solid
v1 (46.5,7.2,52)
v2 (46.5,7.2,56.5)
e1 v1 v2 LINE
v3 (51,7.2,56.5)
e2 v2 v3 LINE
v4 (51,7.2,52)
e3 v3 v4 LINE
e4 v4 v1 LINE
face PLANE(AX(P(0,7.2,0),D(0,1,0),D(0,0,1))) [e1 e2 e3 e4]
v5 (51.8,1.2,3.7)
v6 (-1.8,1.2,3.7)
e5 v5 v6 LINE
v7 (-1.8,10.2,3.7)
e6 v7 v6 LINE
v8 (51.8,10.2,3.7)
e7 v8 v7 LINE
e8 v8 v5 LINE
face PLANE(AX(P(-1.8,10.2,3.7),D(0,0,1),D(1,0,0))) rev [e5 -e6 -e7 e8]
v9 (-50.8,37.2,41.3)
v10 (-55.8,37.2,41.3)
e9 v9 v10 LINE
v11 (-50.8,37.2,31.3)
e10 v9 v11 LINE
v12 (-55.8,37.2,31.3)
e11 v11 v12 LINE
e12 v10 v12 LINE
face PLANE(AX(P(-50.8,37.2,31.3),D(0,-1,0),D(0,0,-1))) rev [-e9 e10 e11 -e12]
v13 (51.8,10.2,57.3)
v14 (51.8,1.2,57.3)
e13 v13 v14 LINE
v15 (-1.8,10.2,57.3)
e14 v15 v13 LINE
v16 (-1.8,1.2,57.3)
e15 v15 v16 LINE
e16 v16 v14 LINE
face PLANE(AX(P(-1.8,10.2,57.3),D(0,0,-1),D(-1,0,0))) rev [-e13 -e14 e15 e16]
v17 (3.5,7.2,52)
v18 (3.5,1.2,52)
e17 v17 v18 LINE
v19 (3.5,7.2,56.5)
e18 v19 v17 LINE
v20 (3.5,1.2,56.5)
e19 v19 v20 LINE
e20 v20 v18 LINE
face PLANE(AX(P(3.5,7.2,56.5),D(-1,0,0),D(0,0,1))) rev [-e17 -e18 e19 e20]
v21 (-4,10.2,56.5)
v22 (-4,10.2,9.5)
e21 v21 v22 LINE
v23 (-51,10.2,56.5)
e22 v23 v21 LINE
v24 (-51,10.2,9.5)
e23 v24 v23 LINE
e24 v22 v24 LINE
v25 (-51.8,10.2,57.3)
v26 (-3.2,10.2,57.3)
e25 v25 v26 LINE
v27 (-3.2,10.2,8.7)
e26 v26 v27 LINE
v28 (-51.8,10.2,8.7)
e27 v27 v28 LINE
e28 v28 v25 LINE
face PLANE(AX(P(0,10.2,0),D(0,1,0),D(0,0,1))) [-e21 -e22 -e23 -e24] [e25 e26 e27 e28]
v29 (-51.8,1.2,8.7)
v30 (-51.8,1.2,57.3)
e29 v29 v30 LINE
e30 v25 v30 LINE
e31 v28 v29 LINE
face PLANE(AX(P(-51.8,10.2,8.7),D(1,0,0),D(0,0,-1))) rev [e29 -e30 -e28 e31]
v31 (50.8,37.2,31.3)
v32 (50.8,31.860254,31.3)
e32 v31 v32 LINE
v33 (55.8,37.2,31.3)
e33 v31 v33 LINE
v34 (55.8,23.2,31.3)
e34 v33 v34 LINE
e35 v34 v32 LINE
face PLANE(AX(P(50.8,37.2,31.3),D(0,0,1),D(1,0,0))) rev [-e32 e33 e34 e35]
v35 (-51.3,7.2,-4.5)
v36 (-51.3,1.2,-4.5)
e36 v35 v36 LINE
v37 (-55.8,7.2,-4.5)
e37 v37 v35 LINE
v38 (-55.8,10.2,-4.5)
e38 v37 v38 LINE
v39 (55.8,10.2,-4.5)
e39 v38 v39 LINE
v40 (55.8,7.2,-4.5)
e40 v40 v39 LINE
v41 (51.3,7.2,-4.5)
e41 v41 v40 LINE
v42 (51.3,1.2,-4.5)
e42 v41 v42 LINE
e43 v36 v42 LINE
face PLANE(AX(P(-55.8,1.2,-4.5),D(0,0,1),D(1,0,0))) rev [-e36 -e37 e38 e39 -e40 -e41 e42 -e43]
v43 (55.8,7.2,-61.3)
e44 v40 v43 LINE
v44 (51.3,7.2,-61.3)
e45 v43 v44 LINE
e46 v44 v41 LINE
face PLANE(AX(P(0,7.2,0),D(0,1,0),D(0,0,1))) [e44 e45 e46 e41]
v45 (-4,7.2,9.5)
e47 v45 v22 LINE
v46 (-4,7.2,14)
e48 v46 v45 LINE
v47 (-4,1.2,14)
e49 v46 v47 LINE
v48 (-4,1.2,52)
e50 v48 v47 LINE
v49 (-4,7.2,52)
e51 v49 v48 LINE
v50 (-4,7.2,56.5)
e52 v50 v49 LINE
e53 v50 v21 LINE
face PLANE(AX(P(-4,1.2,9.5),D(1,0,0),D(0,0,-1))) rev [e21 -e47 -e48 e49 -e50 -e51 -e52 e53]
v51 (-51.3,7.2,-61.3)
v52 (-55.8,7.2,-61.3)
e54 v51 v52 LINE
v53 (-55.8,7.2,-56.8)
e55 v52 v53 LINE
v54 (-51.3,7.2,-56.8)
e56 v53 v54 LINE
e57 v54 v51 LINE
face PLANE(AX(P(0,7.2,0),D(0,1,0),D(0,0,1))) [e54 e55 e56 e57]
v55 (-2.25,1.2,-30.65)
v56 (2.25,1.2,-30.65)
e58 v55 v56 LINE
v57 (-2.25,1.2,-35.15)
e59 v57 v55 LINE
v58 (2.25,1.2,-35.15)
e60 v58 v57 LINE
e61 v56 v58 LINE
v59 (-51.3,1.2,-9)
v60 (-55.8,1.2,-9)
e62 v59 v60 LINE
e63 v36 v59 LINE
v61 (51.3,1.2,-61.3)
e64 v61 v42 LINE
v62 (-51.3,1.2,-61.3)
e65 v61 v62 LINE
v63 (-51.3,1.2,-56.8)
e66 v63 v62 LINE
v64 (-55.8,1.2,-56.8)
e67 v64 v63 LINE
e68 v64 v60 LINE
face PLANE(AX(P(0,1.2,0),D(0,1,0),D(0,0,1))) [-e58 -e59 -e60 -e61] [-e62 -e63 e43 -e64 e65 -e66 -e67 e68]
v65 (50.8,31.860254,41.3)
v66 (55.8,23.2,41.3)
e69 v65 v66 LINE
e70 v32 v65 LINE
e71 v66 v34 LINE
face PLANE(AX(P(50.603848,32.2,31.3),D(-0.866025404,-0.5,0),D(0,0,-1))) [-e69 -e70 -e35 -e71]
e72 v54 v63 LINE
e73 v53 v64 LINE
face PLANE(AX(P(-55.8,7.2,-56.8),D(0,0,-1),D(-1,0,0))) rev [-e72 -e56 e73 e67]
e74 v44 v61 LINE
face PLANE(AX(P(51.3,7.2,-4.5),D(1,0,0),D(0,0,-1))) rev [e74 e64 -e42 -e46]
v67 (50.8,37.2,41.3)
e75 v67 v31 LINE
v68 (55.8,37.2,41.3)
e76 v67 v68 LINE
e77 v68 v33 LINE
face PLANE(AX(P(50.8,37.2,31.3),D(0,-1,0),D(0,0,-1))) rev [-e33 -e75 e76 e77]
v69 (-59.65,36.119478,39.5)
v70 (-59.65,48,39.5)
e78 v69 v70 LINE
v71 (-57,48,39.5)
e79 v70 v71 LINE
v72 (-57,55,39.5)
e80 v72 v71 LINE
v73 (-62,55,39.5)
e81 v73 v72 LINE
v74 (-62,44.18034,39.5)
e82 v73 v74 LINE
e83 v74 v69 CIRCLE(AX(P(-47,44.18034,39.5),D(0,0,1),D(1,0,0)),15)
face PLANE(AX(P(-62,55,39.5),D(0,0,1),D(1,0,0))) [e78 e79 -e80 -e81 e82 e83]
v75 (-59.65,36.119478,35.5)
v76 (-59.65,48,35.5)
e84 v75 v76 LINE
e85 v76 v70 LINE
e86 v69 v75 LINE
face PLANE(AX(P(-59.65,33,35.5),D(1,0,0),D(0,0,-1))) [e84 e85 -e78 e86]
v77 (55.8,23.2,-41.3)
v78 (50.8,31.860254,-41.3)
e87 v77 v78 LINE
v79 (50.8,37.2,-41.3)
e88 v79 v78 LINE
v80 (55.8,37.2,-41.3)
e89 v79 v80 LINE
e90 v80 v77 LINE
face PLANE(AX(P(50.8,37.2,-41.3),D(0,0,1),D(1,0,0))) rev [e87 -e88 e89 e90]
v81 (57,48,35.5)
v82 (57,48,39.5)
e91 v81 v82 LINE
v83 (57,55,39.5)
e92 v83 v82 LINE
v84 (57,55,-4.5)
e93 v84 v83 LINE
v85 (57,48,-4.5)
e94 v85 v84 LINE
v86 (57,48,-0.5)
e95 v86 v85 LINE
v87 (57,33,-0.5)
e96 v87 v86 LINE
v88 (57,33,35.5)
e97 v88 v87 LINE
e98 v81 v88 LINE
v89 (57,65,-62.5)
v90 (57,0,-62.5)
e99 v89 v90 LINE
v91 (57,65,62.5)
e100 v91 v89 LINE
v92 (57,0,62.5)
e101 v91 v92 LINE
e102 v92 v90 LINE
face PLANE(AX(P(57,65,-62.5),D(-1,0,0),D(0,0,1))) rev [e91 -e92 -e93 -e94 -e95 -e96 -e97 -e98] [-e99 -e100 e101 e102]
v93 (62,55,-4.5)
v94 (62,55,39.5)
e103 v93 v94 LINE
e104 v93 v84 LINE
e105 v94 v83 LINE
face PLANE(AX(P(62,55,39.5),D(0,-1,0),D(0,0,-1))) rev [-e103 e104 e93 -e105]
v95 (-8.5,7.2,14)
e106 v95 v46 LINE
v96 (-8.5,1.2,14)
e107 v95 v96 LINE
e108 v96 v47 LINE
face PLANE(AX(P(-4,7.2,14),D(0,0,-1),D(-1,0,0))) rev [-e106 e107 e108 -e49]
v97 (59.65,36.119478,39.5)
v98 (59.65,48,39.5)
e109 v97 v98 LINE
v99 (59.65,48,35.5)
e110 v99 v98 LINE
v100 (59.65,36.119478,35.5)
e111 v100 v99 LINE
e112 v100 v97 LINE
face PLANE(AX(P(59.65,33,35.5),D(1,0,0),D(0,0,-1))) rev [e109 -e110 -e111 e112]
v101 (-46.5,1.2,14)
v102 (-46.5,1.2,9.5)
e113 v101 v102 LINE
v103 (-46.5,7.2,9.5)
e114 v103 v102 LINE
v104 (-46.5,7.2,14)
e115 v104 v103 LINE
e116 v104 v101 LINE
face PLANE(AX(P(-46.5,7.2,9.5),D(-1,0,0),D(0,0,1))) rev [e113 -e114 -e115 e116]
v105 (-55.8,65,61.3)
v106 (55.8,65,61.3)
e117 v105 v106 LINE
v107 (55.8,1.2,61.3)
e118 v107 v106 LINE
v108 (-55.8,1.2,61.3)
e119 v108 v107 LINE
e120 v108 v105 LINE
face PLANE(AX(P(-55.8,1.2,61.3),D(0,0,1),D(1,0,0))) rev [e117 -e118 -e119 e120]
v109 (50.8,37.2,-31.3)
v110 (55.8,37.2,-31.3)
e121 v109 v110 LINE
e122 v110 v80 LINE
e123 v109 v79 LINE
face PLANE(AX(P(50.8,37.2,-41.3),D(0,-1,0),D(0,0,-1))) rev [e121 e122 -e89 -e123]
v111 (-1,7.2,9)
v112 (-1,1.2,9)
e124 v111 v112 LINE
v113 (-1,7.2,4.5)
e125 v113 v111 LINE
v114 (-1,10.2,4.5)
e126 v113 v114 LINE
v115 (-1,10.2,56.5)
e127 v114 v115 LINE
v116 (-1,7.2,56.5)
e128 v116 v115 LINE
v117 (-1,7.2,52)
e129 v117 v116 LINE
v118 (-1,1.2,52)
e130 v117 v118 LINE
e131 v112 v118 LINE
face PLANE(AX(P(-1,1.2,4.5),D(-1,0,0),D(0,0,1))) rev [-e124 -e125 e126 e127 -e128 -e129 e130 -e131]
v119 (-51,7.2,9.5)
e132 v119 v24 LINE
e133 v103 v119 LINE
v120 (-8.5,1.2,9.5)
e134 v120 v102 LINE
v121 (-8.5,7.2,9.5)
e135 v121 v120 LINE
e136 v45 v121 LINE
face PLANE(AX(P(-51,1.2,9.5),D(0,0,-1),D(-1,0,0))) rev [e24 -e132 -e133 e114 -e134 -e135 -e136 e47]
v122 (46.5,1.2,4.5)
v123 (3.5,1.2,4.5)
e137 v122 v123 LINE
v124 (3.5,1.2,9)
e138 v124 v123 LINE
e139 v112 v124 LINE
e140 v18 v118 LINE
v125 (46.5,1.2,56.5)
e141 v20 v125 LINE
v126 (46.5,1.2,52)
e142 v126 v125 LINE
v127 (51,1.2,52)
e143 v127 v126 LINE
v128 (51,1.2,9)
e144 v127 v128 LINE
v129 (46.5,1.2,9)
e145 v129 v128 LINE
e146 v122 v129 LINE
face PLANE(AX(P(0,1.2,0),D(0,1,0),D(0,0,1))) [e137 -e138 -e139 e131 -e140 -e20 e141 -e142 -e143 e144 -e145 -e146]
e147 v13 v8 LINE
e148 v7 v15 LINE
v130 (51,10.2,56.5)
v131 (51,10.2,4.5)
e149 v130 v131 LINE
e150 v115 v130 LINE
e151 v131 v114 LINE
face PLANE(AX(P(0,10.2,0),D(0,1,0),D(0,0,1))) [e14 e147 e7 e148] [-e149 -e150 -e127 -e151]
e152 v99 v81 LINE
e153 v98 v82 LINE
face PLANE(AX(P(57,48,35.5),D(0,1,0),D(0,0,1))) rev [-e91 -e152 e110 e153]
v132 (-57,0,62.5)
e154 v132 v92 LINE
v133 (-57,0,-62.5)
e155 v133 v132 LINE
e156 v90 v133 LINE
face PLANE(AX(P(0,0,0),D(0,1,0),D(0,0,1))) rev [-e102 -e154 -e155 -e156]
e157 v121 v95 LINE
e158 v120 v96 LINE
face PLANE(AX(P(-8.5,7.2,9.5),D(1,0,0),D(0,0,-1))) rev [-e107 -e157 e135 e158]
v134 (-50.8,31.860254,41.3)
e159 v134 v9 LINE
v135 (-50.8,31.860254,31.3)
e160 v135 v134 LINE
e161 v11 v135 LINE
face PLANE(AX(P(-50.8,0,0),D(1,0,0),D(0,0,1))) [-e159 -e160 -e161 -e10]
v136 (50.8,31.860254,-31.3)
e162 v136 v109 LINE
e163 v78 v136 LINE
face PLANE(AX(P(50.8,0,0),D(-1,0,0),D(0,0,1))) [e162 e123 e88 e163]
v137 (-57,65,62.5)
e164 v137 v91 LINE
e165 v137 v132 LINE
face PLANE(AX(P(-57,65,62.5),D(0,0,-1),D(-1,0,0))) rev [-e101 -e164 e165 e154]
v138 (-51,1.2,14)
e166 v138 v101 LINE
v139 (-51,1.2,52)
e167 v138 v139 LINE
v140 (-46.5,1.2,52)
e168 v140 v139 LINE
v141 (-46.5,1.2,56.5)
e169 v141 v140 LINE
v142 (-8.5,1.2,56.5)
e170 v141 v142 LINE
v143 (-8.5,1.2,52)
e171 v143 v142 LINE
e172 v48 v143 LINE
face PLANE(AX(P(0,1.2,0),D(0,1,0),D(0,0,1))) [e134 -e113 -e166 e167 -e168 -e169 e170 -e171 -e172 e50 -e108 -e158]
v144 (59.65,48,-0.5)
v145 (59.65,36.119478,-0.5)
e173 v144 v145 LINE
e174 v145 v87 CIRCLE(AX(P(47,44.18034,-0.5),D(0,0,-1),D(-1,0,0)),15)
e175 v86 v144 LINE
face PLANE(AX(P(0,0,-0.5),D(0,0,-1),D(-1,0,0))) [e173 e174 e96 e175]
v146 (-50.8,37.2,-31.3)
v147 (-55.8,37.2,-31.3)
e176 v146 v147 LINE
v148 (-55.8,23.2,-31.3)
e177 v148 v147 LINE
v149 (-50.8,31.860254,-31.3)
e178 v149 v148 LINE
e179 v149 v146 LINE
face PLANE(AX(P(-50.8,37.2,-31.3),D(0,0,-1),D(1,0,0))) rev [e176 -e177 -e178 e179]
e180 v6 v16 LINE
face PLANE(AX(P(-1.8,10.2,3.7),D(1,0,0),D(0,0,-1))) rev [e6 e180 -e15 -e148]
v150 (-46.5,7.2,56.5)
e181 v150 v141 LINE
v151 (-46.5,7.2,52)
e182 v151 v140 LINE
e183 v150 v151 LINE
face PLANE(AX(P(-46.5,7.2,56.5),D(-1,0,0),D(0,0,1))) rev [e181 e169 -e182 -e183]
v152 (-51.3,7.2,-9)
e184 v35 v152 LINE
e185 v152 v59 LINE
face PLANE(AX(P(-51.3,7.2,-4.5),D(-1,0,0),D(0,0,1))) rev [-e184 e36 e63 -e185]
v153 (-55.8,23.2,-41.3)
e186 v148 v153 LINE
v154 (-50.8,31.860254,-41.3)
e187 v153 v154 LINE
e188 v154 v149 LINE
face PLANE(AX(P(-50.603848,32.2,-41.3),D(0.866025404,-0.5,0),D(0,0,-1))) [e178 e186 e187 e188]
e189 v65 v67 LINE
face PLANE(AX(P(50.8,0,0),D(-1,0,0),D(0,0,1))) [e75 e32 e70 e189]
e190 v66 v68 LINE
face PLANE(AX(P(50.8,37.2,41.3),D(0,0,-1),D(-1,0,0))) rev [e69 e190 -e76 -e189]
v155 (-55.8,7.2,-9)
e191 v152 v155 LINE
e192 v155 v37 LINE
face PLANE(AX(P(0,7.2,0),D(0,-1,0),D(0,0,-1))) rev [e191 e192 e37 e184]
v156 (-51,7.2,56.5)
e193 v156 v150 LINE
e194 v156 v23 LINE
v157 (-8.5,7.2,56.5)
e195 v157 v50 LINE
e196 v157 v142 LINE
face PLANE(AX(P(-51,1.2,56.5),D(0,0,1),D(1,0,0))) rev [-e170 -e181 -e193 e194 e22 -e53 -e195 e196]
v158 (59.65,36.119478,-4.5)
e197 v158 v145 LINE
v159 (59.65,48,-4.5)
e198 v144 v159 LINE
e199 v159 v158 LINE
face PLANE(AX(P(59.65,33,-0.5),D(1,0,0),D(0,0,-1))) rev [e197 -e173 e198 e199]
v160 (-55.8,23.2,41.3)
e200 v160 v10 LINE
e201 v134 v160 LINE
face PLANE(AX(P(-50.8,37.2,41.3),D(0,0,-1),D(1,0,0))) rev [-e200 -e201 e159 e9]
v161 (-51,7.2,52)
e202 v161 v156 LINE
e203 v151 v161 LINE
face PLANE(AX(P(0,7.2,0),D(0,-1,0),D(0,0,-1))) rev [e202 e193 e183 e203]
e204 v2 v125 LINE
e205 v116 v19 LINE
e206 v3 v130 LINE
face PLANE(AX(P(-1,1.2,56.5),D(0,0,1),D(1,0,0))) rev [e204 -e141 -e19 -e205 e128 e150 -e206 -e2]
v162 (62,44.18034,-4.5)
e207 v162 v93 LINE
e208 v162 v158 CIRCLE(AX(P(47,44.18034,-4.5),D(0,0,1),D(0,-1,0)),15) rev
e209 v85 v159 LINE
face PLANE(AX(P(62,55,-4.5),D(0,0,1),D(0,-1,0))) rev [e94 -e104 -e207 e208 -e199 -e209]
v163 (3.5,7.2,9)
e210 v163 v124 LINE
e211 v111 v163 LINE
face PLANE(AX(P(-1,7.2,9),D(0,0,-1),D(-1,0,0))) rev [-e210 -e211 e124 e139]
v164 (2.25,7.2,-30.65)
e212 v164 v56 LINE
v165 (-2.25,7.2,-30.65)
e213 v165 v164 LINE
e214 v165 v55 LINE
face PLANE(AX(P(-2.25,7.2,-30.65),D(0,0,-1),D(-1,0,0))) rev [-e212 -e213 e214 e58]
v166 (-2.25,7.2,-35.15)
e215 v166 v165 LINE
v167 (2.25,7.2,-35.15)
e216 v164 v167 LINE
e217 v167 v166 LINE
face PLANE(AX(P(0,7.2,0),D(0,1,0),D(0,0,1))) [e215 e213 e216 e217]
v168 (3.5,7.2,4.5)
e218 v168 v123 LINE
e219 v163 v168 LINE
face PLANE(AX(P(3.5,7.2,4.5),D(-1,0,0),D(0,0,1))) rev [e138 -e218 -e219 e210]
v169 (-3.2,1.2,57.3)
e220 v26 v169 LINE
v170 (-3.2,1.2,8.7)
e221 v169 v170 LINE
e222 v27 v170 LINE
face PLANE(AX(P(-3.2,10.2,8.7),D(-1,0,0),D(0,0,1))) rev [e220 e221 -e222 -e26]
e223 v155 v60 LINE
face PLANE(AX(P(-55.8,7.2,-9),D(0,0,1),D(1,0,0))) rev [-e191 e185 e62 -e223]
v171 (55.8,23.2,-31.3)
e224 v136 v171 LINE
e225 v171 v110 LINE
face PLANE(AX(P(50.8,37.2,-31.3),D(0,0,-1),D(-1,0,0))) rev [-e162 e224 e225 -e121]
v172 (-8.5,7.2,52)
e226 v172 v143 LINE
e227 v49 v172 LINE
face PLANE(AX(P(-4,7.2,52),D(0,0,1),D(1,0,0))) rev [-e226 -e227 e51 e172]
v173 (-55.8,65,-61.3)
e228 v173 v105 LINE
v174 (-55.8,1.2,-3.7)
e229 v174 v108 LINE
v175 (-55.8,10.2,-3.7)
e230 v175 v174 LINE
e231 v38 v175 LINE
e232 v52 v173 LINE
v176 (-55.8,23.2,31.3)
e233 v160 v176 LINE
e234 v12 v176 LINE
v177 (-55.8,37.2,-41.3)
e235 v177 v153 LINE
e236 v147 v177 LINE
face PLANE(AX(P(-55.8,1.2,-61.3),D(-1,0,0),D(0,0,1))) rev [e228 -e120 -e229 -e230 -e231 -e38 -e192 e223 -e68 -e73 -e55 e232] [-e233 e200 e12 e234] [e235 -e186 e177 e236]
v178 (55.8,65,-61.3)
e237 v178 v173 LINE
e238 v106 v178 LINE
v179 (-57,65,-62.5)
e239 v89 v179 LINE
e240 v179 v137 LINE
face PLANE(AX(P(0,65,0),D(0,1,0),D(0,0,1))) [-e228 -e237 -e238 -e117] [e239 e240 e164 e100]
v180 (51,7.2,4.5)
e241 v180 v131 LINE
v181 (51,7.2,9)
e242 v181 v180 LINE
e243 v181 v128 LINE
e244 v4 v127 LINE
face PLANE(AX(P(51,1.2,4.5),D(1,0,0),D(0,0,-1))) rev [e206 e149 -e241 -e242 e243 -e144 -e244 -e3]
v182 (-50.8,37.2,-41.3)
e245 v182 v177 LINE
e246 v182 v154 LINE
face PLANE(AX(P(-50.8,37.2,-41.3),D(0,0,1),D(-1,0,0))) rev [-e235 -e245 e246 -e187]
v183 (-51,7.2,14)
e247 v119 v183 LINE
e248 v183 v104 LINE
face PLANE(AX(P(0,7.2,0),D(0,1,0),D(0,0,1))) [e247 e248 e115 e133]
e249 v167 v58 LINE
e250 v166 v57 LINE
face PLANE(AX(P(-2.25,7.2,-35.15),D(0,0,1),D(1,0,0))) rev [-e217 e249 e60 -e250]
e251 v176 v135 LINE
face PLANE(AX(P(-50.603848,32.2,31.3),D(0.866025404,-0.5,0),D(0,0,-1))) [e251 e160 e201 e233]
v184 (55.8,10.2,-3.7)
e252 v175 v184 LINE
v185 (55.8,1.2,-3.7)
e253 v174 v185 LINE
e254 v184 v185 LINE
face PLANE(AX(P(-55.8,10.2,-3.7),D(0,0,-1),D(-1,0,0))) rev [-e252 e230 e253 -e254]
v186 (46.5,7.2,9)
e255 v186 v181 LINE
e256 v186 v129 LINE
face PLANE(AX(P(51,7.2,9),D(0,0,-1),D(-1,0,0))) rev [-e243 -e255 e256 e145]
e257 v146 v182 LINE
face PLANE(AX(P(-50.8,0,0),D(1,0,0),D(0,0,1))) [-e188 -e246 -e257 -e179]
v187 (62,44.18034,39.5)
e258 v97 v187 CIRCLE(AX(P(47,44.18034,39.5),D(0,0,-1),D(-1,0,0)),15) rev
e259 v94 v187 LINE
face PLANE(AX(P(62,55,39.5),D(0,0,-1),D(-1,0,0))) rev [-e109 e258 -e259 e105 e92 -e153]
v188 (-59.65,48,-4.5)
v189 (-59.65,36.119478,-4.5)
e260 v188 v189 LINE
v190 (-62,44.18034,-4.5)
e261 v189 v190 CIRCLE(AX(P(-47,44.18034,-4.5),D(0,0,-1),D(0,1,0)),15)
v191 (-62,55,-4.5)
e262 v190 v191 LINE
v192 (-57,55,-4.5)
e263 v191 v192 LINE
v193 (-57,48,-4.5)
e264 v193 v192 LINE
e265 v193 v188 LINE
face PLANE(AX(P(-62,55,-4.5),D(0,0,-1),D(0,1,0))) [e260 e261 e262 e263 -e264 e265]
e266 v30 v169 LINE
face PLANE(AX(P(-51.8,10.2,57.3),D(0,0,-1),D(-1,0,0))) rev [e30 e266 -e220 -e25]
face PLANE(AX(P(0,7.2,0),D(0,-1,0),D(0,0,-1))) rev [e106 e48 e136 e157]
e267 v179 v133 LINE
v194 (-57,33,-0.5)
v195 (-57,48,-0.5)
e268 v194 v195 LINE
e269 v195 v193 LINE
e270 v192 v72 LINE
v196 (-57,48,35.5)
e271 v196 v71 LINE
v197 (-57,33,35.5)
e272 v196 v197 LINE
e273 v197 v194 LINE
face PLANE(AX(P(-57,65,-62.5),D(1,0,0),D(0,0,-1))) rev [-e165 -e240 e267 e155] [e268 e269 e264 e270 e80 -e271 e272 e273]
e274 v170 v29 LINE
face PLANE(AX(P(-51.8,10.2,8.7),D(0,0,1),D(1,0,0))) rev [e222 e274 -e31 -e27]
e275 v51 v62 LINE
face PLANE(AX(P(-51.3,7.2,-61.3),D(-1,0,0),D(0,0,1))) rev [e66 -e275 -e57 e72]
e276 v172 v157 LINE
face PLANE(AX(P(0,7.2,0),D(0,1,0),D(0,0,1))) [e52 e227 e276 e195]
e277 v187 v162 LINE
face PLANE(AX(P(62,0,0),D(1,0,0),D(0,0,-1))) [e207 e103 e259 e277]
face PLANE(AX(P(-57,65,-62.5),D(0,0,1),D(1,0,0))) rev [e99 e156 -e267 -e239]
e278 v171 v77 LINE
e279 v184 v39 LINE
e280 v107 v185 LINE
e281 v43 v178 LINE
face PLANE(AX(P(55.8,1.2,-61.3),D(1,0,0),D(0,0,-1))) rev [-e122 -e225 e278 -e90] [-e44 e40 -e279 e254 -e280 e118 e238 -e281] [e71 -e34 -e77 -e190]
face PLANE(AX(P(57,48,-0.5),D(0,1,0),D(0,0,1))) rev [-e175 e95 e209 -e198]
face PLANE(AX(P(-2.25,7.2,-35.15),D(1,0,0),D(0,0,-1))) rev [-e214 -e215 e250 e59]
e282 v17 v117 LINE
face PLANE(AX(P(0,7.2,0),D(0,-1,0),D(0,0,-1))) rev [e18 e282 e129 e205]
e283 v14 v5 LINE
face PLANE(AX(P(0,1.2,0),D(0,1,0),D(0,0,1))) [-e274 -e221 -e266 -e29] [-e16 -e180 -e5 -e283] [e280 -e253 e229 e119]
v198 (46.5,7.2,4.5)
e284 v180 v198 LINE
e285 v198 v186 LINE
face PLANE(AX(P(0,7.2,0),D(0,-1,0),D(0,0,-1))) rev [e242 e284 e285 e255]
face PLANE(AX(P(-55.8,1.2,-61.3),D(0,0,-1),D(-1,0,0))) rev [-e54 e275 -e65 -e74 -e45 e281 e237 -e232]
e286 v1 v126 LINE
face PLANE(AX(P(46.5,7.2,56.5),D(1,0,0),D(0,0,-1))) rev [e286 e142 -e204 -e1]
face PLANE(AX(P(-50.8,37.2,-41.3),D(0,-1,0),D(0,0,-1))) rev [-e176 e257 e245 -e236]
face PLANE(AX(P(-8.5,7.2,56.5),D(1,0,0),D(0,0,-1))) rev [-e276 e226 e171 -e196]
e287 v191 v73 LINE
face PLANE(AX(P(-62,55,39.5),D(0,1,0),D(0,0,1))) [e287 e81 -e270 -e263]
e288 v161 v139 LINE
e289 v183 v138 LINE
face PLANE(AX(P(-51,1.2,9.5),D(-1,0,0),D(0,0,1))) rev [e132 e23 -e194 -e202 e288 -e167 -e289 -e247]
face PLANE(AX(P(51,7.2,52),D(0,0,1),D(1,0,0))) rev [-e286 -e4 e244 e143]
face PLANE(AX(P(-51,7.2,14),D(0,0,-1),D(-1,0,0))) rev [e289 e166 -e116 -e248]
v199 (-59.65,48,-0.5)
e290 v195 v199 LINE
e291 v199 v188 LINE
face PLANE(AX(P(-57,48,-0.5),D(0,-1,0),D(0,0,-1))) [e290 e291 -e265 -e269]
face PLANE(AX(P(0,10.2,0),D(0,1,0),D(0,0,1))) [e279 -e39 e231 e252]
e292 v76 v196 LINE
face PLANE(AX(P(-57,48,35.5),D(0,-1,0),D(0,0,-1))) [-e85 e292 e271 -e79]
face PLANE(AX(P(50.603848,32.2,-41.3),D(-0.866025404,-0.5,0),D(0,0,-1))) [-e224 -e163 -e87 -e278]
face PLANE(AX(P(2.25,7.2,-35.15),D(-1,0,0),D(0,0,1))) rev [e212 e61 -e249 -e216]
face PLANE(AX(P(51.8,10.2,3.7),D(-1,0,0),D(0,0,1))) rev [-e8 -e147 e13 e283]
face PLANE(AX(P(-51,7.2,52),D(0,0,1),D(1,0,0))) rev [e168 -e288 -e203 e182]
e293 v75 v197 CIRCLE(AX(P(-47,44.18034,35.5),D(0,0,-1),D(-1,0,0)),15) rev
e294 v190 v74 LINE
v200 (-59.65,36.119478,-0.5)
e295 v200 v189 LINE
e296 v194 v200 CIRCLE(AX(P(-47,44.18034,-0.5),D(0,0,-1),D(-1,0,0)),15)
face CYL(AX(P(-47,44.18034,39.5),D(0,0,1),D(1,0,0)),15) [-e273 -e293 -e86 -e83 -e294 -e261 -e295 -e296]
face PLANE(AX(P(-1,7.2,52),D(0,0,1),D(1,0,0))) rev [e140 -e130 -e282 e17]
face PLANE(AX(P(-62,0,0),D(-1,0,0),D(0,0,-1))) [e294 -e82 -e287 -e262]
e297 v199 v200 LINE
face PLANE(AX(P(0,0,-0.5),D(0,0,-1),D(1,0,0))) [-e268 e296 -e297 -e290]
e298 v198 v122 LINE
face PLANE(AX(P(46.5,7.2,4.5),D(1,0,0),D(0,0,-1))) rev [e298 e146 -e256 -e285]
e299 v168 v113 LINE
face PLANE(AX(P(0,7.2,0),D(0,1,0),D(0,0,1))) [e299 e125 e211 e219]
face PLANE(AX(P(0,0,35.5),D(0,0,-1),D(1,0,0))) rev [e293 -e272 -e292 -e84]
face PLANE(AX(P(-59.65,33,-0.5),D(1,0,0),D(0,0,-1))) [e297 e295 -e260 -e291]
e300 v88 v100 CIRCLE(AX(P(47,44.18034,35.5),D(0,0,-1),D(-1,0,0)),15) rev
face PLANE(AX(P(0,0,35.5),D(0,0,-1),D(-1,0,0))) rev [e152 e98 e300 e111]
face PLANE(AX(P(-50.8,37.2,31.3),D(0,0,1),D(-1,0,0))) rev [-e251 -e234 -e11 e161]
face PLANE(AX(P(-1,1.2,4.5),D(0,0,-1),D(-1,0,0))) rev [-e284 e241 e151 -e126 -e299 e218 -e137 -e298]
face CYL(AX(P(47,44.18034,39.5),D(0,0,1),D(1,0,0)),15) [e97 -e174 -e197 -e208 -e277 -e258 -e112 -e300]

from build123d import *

# Parameters (mm, degrees)
SKETCH1_W                  = 114
SKETCH1_H                  = 125
BOSS_EXTRUDE1_DEPTH        = 65
SKETCH2_W                  = 111.6
SKETCH2_H                  = 122.6
CUT_EXTRUDE1_DEPTH         = 63.8
SKETCH3_W                  = 44
SKETCH3_H                  = 22
BOSS_EXTRUDE2_DEPTH        = 5
SKETCH4_W                  = 2.65
SKETCH4_H                  = 15
CUT_EXTRUDE2_DEPTH         = 4
SKETCH6_W                  = 2.65
SKETCH6_H                  = 15
CUT_EXTRUDE3_DEPTH         = 4
FILLET1_R                  = 15
FILLET2_R                  = 15
SKETCH9_W                  = 111.6
SKETCH9_H                  = 57.6
SKETCH9_W_2                = 48.6
SKETCH9_H_2                = 48.6
SKETCH9_W_3                = 53.6
SKETCH9_H_3                = 53.6
BOSS_EXTRUDE4_DEPTH        = 9
SKETCH10_W                 = 111.6
SKETCH10_H                 = 56.8
SKETCH10_W_2               = 47
SKETCH10_H_2               = 47
SKETCH10_W_3               = 52
SKETCH10_H_3               = 52
CUT_EXTRUDE5_DEPTH         = 9
SKETCH11_W                 = 4.5
SKETCH11_H                 = 4.5
SKETCH11_H_2               = 56.8
BOSS_EXTRUDE5_DEPTH        = 6
SKETCH12_W                 = 10
SKETCH12_H                 = 5
BOSS_EXTRUDE6_DEPTH        = 5
CHAMFER1_SIZE              = 9
CHAMFER1_SIZE_2            = 5.196152423
CHAMFER1_OF_MIRROR8_SIZE   = 9
CHAMFER1_OF_MIRROR8_SIZE_2 = 5.196152423


with BuildPart() as part:
    # Sketch1 → Boss-Extrude1 (new body)
    with BuildSketch(Plane(origin=(0, 0, 0), x_dir=(1, 0, 0), z_dir=(0, 1, 0))):
        Rectangle(SKETCH1_W, SKETCH1_H)
    extrude(amount=BOSS_EXTRUDE1_DEPTH)

    # Sketch2 → Cut-Extrude1 (cut)
    with BuildSketch(Plane(origin=(0, 65, 0), x_dir=(1, 0, 0), z_dir=(0, 1, 0))):
        Rectangle(SKETCH2_W, SKETCH2_H)
    extrude(amount=-CUT_EXTRUDE1_DEPTH, mode=Mode.SUBTRACT)

    # Sketch3 → Boss-Extrude2 (add)
    with BuildSketch(Plane(origin=(57, 0, 0), x_dir=(0, 0, -1), z_dir=(1, 0, 0))):
        with Locations((-17.5, 44)):
            Rectangle(SKETCH3_W, SKETCH3_H)
    boss_extrude2 = extrude(amount=BOSS_EXTRUDE2_DEPTH)

    # Sketch4 → Cut-Extrude2 (cut)
    with BuildSketch(Plane.XY.offset(39.5)):
        with Locations((58.325, 40.5)):
            Rectangle(SKETCH4_W, SKETCH4_H)
    cut_extrude2 = extrude(amount=-CUT_EXTRUDE2_DEPTH, mode=Mode.SUBTRACT)

    # Sketch6 → Cut-Extrude3 (cut)
    with BuildSketch(Plane(origin=(0, 0, -4.5), x_dir=(-1, 0, 0), z_dir=(0, 0, -1))):
        with Locations((-58.325, 40.5)):
            Rectangle(SKETCH6_W, SKETCH6_H)
    cut_extrude3 = extrude(amount=-CUT_EXTRUDE3_DEPTH, mode=Mode.SUBTRACT)

    # Mirror5: Boss-Extrude2 across plane
    add(boss_extrude2.mirror(Plane(origin=(0, 0, 0), x_dir=(0, 0, 1), z_dir=(1, 0, 0))))

    # Mirror6: Cut-Extrude2 across plane
    add(cut_extrude2.mirror(Plane(origin=(0, 0, 0), x_dir=(0, 0, 1), z_dir=(1, 0, 0))), mode=Mode.SUBTRACT)

    # Mirror7: Cut-Extrude3 across plane
    add(cut_extrude3.mirror(Plane(origin=(0, 0, 0), x_dir=(0, 0, 1), z_dir=(1, 0, 0))), mode=Mode.SUBTRACT)

    # Fillet1
    # the kernel refuses this fillet: 15 mm, written as the material it takes off along each edge
    with BuildSketch(Plane(origin=(62, 33, -32.450849719), x_dir=(-1, 0, 0), z_dir=(0, 0, 1))) as fillet1_piece_1:
        with BuildLine():
            CenterArc((15, -11.180339887), FILLET1_R, 131.810314896, 48.189685104)
            Line((0, -11.180339887), (-0.3, -11.180339887))
            Line((-0.3, -11.180339887), (-0.3, 0))
            Line((-0.3, 0), (0, 0.3))
            ThreePointArc((0, 0.3), (2.5, 0.3), (4.8, 0.223606798))
            Line((4.8, 0.223606798), (5, 0))
        make_face()
    extrude(amount=99.901699437, mode=Mode.SUBTRACT)

    # Fillet2
    # the kernel refuses this fillet: 15 mm, written as the material it takes off along each edge
    with BuildSketch(Plane(origin=(-62, 33, -32.450849719), x_dir=(1, 0, 0), z_dir=(0, 0, 1))) as fillet2_piece_1:
        with BuildLine():
            CenterArc((15, 11.180339887), FILLET2_R, 180, 48.189685104)
            Line((0, 11.180339887), (-0.3, 11.180339887))
            Line((-0.3, 11.180339887), (-0.3, 0))
            Line((-0.3, 0), (0, -0.3))
            ThreePointArc((0, -0.3), (2.5, -0.3), (4.8, -0.223606798))
            Line((4.8, -0.223606798), (5, 0))
        make_face()
    extrude(amount=99.901699437, mode=Mode.SUBTRACT)

    # Sketch9 → Boss-Extrude4 (add)
    with BuildSketch(Plane(origin=(0, 1.2, 0), x_dir=(1, 0, 0), z_dir=(0, 1, 0))):
        with Locations((0, 32.5)):
            Rectangle(SKETCH9_W, SKETCH9_H)
        with Locations((-27.5, -33)):
            Rectangle(SKETCH9_W_2, SKETCH9_H_2)
        with Locations((25, -30.5)):
            Rectangle(SKETCH9_W_3, SKETCH9_H_3)
    extrude(amount=BOSS_EXTRUDE4_DEPTH)

    # Sketch10 → Cut-Extrude5 (cut)
    with BuildSketch(Plane(origin=(0, 10.2, 0), x_dir=(1, 0, 0), z_dir=(0, 1, 0))):
        with Locations((0, 32.9)):
            Rectangle(SKETCH10_W, SKETCH10_H)
        with Locations((-27.5, -33)):
            Rectangle(SKETCH10_W_2, SKETCH10_H_2)
        with Locations((25, -30.5)):
            Rectangle(SKETCH10_W_3, SKETCH10_H_3)
    extrude(amount=-CUT_EXTRUDE5_DEPTH, mode=Mode.SUBTRACT)

    # Sketch11 → Boss-Extrude5 (add)
    with BuildSketch(Plane(origin=(0, 1.2, 0), x_dir=(1, 0, 0), z_dir=(0, 1, 0))):
        with Locations((-53.55, 59.05)):
            Rectangle(SKETCH11_W, SKETCH11_H)
        with Locations((-53.55, 6.75)):
            Rectangle(SKETCH11_W, SKETCH11_H)
        with Locations((53.55, 32.9)):
            Rectangle(SKETCH11_W, SKETCH11_H_2)
        with Locations((-48.75, -11.75)):
            Rectangle(SKETCH11_W, SKETCH11_H)
        with Locations((1.25, -6.75)):
            Rectangle(SKETCH11_W, SKETCH11_H)
        with Locations((-6.25, -11.75)):
            Rectangle(SKETCH11_W, SKETCH11_H)
        with Locations((48.75, -6.75)):
            Rectangle(SKETCH11_W, SKETCH11_H)
        with Locations((-48.75, -54.25)):
            Rectangle(SKETCH11_W, SKETCH11_H)
        with Locations((1.25, -54.25)):
            Rectangle(SKETCH11_W, SKETCH11_H)
        with Locations((-6.25, -54.25)):
            Rectangle(SKETCH11_W, SKETCH11_H)
        with Locations((48.75, -54.25)):
            Rectangle(SKETCH11_W, SKETCH11_H)
        with Locations((0, 32.9)):
            Rectangle(SKETCH11_W, SKETCH11_H)
    extrude(amount=BOSS_EXTRUDE5_DEPTH)

    # Sketch12 → Boss-Extrude6 (add)
    with BuildSketch(Plane.ZY.offset(-55.8)):
        with Locations((-36.3, 34.7)):
            Rectangle(SKETCH12_W, SKETCH12_H)
        with Locations((36.3, 34.7)):
            Rectangle(SKETCH12_W, SKETCH12_H)
    boss_extrude6 = extrude(amount=BOSS_EXTRUDE6_DEPTH)

    # Chamfer1
    # the kernel refuses this chamfer: 9, 5.196152423 mm, written as the material it adds along each edge
    with BuildSketch(Plane(origin=(55.8, 32.2, 41.3), x_dir=(0.019326765612700678, -0.999813220622208, 0), z_dir=(0, 0, -1))) as chamfer1_piece_1_section:
        Polygon((CHAMFER1_SIZE * 0.999813220622, CHAMFER1_SIZE * 0.0193267656127), (-CHAMFER1_SIZE_2 * 0.0193267656116, CHAMFER1_SIZE_2 * 0.999813220566), (0, 0), align=None)
    chamfer1_piece_1 = extrude(amount=10, mode=Mode.PRIVATE)
    chamfer1_piece_1 = split(chamfer1_piece_1, bisect_by=Plane(origin=(50.8, 29.159896695, 36.3), z_dir=(1, 0, 0)), keep=Keep.TOP, mode=Mode.PRIVATE)
    add(chamfer1_piece_1)
    with BuildSketch(Plane(origin=(55.8, 32.2, -31.3), x_dir=(0.019326765612700678, -0.999813220622208, 0), z_dir=(0, 0, -1))) as chamfer1_piece_2_section:
        Polygon((CHAMFER1_SIZE * 0.999813220622, CHAMFER1_SIZE * 0.0193267656127), (-CHAMFER1_SIZE_2 * 0.0193267656116, CHAMFER1_SIZE_2 * 0.999813220566), (0, 0), align=None)
    chamfer1_piece_2 = extrude(amount=10, mode=Mode.PRIVATE)
    chamfer1_piece_2 = split(chamfer1_piece_2, bisect_by=Plane(origin=(50.8, 29.159896695, -36.3), z_dir=(1, 0, 0)), keep=Keep.TOP, mode=Mode.PRIVATE)
    add(chamfer1_piece_2)

    # Mirror8: Boss-Extrude6 across plane
    add(boss_extrude6.mirror(Plane(origin=(0, 0, 0), x_dir=(0, 0, 1), z_dir=(1, 0, 0))))

    # Chamfer1 of Mirror8
    # the kernel refuses this chamfer: 9, 5.196152423 mm, written as the material it adds along each edge
    with BuildSketch(Plane(origin=(-55.8, 32.2, 41.3), x_dir=(-0.01932676561270296, -0.9998132206222078, 0), z_dir=(0, 0, -1))) as chamfer1_of_mirror8_piece_1_section:
        Polygon((CHAMFER1_OF_MIRROR8_SIZE * 0.999813220622, -CHAMFER1_OF_MIRROR8_SIZE * 0.0193267656127), (-CHAMFER1_OF_MIRROR8_SIZE_2 * 0.0193267656116, -CHAMFER1_OF_MIRROR8_SIZE_2 * 0.999813220566), (0, 0), align=None)
    chamfer1_of_mirror8_piece_1 = extrude(amount=10, mode=Mode.PRIVATE)
    chamfer1_of_mirror8_piece_1 = split(chamfer1_of_mirror8_piece_1, bisect_by=Plane(origin=(-50.8, 29.159896695, 36.3), z_dir=(-1, 0, 0)), keep=Keep.TOP, mode=Mode.PRIVATE)
    add(chamfer1_of_mirror8_piece_1)
    with BuildSketch(Plane(origin=(-55.8, 32.2, -31.3), x_dir=(-0.01932676561270296, -0.9998132206222078, 0), z_dir=(0, 0, -1))) as chamfer1_of_mirror8_piece_2_section:
        Polygon((CHAMFER1_OF_MIRROR8_SIZE * 0.999813220622, -CHAMFER1_OF_MIRROR8_SIZE * 0.0193267656127), (-CHAMFER1_OF_MIRROR8_SIZE_2 * 0.0193267656116, -CHAMFER1_OF_MIRROR8_SIZE_2 * 0.999813220566), (0, 0), align=None)
    chamfer1_of_mirror8_piece_2 = extrude(amount=10, mode=Mode.PRIVATE)
    chamfer1_of_mirror8_piece_2 = split(chamfer1_of_mirror8_piece_2, bisect_by=Plane(origin=(-50.8, 29.159896695, -36.3), z_dir=(-1, 0, 0)), keep=Keep.TOP, mode=Mode.PRIVATE)
    add(chamfer1_of_mirror8_piece_2)


solid = part.part
